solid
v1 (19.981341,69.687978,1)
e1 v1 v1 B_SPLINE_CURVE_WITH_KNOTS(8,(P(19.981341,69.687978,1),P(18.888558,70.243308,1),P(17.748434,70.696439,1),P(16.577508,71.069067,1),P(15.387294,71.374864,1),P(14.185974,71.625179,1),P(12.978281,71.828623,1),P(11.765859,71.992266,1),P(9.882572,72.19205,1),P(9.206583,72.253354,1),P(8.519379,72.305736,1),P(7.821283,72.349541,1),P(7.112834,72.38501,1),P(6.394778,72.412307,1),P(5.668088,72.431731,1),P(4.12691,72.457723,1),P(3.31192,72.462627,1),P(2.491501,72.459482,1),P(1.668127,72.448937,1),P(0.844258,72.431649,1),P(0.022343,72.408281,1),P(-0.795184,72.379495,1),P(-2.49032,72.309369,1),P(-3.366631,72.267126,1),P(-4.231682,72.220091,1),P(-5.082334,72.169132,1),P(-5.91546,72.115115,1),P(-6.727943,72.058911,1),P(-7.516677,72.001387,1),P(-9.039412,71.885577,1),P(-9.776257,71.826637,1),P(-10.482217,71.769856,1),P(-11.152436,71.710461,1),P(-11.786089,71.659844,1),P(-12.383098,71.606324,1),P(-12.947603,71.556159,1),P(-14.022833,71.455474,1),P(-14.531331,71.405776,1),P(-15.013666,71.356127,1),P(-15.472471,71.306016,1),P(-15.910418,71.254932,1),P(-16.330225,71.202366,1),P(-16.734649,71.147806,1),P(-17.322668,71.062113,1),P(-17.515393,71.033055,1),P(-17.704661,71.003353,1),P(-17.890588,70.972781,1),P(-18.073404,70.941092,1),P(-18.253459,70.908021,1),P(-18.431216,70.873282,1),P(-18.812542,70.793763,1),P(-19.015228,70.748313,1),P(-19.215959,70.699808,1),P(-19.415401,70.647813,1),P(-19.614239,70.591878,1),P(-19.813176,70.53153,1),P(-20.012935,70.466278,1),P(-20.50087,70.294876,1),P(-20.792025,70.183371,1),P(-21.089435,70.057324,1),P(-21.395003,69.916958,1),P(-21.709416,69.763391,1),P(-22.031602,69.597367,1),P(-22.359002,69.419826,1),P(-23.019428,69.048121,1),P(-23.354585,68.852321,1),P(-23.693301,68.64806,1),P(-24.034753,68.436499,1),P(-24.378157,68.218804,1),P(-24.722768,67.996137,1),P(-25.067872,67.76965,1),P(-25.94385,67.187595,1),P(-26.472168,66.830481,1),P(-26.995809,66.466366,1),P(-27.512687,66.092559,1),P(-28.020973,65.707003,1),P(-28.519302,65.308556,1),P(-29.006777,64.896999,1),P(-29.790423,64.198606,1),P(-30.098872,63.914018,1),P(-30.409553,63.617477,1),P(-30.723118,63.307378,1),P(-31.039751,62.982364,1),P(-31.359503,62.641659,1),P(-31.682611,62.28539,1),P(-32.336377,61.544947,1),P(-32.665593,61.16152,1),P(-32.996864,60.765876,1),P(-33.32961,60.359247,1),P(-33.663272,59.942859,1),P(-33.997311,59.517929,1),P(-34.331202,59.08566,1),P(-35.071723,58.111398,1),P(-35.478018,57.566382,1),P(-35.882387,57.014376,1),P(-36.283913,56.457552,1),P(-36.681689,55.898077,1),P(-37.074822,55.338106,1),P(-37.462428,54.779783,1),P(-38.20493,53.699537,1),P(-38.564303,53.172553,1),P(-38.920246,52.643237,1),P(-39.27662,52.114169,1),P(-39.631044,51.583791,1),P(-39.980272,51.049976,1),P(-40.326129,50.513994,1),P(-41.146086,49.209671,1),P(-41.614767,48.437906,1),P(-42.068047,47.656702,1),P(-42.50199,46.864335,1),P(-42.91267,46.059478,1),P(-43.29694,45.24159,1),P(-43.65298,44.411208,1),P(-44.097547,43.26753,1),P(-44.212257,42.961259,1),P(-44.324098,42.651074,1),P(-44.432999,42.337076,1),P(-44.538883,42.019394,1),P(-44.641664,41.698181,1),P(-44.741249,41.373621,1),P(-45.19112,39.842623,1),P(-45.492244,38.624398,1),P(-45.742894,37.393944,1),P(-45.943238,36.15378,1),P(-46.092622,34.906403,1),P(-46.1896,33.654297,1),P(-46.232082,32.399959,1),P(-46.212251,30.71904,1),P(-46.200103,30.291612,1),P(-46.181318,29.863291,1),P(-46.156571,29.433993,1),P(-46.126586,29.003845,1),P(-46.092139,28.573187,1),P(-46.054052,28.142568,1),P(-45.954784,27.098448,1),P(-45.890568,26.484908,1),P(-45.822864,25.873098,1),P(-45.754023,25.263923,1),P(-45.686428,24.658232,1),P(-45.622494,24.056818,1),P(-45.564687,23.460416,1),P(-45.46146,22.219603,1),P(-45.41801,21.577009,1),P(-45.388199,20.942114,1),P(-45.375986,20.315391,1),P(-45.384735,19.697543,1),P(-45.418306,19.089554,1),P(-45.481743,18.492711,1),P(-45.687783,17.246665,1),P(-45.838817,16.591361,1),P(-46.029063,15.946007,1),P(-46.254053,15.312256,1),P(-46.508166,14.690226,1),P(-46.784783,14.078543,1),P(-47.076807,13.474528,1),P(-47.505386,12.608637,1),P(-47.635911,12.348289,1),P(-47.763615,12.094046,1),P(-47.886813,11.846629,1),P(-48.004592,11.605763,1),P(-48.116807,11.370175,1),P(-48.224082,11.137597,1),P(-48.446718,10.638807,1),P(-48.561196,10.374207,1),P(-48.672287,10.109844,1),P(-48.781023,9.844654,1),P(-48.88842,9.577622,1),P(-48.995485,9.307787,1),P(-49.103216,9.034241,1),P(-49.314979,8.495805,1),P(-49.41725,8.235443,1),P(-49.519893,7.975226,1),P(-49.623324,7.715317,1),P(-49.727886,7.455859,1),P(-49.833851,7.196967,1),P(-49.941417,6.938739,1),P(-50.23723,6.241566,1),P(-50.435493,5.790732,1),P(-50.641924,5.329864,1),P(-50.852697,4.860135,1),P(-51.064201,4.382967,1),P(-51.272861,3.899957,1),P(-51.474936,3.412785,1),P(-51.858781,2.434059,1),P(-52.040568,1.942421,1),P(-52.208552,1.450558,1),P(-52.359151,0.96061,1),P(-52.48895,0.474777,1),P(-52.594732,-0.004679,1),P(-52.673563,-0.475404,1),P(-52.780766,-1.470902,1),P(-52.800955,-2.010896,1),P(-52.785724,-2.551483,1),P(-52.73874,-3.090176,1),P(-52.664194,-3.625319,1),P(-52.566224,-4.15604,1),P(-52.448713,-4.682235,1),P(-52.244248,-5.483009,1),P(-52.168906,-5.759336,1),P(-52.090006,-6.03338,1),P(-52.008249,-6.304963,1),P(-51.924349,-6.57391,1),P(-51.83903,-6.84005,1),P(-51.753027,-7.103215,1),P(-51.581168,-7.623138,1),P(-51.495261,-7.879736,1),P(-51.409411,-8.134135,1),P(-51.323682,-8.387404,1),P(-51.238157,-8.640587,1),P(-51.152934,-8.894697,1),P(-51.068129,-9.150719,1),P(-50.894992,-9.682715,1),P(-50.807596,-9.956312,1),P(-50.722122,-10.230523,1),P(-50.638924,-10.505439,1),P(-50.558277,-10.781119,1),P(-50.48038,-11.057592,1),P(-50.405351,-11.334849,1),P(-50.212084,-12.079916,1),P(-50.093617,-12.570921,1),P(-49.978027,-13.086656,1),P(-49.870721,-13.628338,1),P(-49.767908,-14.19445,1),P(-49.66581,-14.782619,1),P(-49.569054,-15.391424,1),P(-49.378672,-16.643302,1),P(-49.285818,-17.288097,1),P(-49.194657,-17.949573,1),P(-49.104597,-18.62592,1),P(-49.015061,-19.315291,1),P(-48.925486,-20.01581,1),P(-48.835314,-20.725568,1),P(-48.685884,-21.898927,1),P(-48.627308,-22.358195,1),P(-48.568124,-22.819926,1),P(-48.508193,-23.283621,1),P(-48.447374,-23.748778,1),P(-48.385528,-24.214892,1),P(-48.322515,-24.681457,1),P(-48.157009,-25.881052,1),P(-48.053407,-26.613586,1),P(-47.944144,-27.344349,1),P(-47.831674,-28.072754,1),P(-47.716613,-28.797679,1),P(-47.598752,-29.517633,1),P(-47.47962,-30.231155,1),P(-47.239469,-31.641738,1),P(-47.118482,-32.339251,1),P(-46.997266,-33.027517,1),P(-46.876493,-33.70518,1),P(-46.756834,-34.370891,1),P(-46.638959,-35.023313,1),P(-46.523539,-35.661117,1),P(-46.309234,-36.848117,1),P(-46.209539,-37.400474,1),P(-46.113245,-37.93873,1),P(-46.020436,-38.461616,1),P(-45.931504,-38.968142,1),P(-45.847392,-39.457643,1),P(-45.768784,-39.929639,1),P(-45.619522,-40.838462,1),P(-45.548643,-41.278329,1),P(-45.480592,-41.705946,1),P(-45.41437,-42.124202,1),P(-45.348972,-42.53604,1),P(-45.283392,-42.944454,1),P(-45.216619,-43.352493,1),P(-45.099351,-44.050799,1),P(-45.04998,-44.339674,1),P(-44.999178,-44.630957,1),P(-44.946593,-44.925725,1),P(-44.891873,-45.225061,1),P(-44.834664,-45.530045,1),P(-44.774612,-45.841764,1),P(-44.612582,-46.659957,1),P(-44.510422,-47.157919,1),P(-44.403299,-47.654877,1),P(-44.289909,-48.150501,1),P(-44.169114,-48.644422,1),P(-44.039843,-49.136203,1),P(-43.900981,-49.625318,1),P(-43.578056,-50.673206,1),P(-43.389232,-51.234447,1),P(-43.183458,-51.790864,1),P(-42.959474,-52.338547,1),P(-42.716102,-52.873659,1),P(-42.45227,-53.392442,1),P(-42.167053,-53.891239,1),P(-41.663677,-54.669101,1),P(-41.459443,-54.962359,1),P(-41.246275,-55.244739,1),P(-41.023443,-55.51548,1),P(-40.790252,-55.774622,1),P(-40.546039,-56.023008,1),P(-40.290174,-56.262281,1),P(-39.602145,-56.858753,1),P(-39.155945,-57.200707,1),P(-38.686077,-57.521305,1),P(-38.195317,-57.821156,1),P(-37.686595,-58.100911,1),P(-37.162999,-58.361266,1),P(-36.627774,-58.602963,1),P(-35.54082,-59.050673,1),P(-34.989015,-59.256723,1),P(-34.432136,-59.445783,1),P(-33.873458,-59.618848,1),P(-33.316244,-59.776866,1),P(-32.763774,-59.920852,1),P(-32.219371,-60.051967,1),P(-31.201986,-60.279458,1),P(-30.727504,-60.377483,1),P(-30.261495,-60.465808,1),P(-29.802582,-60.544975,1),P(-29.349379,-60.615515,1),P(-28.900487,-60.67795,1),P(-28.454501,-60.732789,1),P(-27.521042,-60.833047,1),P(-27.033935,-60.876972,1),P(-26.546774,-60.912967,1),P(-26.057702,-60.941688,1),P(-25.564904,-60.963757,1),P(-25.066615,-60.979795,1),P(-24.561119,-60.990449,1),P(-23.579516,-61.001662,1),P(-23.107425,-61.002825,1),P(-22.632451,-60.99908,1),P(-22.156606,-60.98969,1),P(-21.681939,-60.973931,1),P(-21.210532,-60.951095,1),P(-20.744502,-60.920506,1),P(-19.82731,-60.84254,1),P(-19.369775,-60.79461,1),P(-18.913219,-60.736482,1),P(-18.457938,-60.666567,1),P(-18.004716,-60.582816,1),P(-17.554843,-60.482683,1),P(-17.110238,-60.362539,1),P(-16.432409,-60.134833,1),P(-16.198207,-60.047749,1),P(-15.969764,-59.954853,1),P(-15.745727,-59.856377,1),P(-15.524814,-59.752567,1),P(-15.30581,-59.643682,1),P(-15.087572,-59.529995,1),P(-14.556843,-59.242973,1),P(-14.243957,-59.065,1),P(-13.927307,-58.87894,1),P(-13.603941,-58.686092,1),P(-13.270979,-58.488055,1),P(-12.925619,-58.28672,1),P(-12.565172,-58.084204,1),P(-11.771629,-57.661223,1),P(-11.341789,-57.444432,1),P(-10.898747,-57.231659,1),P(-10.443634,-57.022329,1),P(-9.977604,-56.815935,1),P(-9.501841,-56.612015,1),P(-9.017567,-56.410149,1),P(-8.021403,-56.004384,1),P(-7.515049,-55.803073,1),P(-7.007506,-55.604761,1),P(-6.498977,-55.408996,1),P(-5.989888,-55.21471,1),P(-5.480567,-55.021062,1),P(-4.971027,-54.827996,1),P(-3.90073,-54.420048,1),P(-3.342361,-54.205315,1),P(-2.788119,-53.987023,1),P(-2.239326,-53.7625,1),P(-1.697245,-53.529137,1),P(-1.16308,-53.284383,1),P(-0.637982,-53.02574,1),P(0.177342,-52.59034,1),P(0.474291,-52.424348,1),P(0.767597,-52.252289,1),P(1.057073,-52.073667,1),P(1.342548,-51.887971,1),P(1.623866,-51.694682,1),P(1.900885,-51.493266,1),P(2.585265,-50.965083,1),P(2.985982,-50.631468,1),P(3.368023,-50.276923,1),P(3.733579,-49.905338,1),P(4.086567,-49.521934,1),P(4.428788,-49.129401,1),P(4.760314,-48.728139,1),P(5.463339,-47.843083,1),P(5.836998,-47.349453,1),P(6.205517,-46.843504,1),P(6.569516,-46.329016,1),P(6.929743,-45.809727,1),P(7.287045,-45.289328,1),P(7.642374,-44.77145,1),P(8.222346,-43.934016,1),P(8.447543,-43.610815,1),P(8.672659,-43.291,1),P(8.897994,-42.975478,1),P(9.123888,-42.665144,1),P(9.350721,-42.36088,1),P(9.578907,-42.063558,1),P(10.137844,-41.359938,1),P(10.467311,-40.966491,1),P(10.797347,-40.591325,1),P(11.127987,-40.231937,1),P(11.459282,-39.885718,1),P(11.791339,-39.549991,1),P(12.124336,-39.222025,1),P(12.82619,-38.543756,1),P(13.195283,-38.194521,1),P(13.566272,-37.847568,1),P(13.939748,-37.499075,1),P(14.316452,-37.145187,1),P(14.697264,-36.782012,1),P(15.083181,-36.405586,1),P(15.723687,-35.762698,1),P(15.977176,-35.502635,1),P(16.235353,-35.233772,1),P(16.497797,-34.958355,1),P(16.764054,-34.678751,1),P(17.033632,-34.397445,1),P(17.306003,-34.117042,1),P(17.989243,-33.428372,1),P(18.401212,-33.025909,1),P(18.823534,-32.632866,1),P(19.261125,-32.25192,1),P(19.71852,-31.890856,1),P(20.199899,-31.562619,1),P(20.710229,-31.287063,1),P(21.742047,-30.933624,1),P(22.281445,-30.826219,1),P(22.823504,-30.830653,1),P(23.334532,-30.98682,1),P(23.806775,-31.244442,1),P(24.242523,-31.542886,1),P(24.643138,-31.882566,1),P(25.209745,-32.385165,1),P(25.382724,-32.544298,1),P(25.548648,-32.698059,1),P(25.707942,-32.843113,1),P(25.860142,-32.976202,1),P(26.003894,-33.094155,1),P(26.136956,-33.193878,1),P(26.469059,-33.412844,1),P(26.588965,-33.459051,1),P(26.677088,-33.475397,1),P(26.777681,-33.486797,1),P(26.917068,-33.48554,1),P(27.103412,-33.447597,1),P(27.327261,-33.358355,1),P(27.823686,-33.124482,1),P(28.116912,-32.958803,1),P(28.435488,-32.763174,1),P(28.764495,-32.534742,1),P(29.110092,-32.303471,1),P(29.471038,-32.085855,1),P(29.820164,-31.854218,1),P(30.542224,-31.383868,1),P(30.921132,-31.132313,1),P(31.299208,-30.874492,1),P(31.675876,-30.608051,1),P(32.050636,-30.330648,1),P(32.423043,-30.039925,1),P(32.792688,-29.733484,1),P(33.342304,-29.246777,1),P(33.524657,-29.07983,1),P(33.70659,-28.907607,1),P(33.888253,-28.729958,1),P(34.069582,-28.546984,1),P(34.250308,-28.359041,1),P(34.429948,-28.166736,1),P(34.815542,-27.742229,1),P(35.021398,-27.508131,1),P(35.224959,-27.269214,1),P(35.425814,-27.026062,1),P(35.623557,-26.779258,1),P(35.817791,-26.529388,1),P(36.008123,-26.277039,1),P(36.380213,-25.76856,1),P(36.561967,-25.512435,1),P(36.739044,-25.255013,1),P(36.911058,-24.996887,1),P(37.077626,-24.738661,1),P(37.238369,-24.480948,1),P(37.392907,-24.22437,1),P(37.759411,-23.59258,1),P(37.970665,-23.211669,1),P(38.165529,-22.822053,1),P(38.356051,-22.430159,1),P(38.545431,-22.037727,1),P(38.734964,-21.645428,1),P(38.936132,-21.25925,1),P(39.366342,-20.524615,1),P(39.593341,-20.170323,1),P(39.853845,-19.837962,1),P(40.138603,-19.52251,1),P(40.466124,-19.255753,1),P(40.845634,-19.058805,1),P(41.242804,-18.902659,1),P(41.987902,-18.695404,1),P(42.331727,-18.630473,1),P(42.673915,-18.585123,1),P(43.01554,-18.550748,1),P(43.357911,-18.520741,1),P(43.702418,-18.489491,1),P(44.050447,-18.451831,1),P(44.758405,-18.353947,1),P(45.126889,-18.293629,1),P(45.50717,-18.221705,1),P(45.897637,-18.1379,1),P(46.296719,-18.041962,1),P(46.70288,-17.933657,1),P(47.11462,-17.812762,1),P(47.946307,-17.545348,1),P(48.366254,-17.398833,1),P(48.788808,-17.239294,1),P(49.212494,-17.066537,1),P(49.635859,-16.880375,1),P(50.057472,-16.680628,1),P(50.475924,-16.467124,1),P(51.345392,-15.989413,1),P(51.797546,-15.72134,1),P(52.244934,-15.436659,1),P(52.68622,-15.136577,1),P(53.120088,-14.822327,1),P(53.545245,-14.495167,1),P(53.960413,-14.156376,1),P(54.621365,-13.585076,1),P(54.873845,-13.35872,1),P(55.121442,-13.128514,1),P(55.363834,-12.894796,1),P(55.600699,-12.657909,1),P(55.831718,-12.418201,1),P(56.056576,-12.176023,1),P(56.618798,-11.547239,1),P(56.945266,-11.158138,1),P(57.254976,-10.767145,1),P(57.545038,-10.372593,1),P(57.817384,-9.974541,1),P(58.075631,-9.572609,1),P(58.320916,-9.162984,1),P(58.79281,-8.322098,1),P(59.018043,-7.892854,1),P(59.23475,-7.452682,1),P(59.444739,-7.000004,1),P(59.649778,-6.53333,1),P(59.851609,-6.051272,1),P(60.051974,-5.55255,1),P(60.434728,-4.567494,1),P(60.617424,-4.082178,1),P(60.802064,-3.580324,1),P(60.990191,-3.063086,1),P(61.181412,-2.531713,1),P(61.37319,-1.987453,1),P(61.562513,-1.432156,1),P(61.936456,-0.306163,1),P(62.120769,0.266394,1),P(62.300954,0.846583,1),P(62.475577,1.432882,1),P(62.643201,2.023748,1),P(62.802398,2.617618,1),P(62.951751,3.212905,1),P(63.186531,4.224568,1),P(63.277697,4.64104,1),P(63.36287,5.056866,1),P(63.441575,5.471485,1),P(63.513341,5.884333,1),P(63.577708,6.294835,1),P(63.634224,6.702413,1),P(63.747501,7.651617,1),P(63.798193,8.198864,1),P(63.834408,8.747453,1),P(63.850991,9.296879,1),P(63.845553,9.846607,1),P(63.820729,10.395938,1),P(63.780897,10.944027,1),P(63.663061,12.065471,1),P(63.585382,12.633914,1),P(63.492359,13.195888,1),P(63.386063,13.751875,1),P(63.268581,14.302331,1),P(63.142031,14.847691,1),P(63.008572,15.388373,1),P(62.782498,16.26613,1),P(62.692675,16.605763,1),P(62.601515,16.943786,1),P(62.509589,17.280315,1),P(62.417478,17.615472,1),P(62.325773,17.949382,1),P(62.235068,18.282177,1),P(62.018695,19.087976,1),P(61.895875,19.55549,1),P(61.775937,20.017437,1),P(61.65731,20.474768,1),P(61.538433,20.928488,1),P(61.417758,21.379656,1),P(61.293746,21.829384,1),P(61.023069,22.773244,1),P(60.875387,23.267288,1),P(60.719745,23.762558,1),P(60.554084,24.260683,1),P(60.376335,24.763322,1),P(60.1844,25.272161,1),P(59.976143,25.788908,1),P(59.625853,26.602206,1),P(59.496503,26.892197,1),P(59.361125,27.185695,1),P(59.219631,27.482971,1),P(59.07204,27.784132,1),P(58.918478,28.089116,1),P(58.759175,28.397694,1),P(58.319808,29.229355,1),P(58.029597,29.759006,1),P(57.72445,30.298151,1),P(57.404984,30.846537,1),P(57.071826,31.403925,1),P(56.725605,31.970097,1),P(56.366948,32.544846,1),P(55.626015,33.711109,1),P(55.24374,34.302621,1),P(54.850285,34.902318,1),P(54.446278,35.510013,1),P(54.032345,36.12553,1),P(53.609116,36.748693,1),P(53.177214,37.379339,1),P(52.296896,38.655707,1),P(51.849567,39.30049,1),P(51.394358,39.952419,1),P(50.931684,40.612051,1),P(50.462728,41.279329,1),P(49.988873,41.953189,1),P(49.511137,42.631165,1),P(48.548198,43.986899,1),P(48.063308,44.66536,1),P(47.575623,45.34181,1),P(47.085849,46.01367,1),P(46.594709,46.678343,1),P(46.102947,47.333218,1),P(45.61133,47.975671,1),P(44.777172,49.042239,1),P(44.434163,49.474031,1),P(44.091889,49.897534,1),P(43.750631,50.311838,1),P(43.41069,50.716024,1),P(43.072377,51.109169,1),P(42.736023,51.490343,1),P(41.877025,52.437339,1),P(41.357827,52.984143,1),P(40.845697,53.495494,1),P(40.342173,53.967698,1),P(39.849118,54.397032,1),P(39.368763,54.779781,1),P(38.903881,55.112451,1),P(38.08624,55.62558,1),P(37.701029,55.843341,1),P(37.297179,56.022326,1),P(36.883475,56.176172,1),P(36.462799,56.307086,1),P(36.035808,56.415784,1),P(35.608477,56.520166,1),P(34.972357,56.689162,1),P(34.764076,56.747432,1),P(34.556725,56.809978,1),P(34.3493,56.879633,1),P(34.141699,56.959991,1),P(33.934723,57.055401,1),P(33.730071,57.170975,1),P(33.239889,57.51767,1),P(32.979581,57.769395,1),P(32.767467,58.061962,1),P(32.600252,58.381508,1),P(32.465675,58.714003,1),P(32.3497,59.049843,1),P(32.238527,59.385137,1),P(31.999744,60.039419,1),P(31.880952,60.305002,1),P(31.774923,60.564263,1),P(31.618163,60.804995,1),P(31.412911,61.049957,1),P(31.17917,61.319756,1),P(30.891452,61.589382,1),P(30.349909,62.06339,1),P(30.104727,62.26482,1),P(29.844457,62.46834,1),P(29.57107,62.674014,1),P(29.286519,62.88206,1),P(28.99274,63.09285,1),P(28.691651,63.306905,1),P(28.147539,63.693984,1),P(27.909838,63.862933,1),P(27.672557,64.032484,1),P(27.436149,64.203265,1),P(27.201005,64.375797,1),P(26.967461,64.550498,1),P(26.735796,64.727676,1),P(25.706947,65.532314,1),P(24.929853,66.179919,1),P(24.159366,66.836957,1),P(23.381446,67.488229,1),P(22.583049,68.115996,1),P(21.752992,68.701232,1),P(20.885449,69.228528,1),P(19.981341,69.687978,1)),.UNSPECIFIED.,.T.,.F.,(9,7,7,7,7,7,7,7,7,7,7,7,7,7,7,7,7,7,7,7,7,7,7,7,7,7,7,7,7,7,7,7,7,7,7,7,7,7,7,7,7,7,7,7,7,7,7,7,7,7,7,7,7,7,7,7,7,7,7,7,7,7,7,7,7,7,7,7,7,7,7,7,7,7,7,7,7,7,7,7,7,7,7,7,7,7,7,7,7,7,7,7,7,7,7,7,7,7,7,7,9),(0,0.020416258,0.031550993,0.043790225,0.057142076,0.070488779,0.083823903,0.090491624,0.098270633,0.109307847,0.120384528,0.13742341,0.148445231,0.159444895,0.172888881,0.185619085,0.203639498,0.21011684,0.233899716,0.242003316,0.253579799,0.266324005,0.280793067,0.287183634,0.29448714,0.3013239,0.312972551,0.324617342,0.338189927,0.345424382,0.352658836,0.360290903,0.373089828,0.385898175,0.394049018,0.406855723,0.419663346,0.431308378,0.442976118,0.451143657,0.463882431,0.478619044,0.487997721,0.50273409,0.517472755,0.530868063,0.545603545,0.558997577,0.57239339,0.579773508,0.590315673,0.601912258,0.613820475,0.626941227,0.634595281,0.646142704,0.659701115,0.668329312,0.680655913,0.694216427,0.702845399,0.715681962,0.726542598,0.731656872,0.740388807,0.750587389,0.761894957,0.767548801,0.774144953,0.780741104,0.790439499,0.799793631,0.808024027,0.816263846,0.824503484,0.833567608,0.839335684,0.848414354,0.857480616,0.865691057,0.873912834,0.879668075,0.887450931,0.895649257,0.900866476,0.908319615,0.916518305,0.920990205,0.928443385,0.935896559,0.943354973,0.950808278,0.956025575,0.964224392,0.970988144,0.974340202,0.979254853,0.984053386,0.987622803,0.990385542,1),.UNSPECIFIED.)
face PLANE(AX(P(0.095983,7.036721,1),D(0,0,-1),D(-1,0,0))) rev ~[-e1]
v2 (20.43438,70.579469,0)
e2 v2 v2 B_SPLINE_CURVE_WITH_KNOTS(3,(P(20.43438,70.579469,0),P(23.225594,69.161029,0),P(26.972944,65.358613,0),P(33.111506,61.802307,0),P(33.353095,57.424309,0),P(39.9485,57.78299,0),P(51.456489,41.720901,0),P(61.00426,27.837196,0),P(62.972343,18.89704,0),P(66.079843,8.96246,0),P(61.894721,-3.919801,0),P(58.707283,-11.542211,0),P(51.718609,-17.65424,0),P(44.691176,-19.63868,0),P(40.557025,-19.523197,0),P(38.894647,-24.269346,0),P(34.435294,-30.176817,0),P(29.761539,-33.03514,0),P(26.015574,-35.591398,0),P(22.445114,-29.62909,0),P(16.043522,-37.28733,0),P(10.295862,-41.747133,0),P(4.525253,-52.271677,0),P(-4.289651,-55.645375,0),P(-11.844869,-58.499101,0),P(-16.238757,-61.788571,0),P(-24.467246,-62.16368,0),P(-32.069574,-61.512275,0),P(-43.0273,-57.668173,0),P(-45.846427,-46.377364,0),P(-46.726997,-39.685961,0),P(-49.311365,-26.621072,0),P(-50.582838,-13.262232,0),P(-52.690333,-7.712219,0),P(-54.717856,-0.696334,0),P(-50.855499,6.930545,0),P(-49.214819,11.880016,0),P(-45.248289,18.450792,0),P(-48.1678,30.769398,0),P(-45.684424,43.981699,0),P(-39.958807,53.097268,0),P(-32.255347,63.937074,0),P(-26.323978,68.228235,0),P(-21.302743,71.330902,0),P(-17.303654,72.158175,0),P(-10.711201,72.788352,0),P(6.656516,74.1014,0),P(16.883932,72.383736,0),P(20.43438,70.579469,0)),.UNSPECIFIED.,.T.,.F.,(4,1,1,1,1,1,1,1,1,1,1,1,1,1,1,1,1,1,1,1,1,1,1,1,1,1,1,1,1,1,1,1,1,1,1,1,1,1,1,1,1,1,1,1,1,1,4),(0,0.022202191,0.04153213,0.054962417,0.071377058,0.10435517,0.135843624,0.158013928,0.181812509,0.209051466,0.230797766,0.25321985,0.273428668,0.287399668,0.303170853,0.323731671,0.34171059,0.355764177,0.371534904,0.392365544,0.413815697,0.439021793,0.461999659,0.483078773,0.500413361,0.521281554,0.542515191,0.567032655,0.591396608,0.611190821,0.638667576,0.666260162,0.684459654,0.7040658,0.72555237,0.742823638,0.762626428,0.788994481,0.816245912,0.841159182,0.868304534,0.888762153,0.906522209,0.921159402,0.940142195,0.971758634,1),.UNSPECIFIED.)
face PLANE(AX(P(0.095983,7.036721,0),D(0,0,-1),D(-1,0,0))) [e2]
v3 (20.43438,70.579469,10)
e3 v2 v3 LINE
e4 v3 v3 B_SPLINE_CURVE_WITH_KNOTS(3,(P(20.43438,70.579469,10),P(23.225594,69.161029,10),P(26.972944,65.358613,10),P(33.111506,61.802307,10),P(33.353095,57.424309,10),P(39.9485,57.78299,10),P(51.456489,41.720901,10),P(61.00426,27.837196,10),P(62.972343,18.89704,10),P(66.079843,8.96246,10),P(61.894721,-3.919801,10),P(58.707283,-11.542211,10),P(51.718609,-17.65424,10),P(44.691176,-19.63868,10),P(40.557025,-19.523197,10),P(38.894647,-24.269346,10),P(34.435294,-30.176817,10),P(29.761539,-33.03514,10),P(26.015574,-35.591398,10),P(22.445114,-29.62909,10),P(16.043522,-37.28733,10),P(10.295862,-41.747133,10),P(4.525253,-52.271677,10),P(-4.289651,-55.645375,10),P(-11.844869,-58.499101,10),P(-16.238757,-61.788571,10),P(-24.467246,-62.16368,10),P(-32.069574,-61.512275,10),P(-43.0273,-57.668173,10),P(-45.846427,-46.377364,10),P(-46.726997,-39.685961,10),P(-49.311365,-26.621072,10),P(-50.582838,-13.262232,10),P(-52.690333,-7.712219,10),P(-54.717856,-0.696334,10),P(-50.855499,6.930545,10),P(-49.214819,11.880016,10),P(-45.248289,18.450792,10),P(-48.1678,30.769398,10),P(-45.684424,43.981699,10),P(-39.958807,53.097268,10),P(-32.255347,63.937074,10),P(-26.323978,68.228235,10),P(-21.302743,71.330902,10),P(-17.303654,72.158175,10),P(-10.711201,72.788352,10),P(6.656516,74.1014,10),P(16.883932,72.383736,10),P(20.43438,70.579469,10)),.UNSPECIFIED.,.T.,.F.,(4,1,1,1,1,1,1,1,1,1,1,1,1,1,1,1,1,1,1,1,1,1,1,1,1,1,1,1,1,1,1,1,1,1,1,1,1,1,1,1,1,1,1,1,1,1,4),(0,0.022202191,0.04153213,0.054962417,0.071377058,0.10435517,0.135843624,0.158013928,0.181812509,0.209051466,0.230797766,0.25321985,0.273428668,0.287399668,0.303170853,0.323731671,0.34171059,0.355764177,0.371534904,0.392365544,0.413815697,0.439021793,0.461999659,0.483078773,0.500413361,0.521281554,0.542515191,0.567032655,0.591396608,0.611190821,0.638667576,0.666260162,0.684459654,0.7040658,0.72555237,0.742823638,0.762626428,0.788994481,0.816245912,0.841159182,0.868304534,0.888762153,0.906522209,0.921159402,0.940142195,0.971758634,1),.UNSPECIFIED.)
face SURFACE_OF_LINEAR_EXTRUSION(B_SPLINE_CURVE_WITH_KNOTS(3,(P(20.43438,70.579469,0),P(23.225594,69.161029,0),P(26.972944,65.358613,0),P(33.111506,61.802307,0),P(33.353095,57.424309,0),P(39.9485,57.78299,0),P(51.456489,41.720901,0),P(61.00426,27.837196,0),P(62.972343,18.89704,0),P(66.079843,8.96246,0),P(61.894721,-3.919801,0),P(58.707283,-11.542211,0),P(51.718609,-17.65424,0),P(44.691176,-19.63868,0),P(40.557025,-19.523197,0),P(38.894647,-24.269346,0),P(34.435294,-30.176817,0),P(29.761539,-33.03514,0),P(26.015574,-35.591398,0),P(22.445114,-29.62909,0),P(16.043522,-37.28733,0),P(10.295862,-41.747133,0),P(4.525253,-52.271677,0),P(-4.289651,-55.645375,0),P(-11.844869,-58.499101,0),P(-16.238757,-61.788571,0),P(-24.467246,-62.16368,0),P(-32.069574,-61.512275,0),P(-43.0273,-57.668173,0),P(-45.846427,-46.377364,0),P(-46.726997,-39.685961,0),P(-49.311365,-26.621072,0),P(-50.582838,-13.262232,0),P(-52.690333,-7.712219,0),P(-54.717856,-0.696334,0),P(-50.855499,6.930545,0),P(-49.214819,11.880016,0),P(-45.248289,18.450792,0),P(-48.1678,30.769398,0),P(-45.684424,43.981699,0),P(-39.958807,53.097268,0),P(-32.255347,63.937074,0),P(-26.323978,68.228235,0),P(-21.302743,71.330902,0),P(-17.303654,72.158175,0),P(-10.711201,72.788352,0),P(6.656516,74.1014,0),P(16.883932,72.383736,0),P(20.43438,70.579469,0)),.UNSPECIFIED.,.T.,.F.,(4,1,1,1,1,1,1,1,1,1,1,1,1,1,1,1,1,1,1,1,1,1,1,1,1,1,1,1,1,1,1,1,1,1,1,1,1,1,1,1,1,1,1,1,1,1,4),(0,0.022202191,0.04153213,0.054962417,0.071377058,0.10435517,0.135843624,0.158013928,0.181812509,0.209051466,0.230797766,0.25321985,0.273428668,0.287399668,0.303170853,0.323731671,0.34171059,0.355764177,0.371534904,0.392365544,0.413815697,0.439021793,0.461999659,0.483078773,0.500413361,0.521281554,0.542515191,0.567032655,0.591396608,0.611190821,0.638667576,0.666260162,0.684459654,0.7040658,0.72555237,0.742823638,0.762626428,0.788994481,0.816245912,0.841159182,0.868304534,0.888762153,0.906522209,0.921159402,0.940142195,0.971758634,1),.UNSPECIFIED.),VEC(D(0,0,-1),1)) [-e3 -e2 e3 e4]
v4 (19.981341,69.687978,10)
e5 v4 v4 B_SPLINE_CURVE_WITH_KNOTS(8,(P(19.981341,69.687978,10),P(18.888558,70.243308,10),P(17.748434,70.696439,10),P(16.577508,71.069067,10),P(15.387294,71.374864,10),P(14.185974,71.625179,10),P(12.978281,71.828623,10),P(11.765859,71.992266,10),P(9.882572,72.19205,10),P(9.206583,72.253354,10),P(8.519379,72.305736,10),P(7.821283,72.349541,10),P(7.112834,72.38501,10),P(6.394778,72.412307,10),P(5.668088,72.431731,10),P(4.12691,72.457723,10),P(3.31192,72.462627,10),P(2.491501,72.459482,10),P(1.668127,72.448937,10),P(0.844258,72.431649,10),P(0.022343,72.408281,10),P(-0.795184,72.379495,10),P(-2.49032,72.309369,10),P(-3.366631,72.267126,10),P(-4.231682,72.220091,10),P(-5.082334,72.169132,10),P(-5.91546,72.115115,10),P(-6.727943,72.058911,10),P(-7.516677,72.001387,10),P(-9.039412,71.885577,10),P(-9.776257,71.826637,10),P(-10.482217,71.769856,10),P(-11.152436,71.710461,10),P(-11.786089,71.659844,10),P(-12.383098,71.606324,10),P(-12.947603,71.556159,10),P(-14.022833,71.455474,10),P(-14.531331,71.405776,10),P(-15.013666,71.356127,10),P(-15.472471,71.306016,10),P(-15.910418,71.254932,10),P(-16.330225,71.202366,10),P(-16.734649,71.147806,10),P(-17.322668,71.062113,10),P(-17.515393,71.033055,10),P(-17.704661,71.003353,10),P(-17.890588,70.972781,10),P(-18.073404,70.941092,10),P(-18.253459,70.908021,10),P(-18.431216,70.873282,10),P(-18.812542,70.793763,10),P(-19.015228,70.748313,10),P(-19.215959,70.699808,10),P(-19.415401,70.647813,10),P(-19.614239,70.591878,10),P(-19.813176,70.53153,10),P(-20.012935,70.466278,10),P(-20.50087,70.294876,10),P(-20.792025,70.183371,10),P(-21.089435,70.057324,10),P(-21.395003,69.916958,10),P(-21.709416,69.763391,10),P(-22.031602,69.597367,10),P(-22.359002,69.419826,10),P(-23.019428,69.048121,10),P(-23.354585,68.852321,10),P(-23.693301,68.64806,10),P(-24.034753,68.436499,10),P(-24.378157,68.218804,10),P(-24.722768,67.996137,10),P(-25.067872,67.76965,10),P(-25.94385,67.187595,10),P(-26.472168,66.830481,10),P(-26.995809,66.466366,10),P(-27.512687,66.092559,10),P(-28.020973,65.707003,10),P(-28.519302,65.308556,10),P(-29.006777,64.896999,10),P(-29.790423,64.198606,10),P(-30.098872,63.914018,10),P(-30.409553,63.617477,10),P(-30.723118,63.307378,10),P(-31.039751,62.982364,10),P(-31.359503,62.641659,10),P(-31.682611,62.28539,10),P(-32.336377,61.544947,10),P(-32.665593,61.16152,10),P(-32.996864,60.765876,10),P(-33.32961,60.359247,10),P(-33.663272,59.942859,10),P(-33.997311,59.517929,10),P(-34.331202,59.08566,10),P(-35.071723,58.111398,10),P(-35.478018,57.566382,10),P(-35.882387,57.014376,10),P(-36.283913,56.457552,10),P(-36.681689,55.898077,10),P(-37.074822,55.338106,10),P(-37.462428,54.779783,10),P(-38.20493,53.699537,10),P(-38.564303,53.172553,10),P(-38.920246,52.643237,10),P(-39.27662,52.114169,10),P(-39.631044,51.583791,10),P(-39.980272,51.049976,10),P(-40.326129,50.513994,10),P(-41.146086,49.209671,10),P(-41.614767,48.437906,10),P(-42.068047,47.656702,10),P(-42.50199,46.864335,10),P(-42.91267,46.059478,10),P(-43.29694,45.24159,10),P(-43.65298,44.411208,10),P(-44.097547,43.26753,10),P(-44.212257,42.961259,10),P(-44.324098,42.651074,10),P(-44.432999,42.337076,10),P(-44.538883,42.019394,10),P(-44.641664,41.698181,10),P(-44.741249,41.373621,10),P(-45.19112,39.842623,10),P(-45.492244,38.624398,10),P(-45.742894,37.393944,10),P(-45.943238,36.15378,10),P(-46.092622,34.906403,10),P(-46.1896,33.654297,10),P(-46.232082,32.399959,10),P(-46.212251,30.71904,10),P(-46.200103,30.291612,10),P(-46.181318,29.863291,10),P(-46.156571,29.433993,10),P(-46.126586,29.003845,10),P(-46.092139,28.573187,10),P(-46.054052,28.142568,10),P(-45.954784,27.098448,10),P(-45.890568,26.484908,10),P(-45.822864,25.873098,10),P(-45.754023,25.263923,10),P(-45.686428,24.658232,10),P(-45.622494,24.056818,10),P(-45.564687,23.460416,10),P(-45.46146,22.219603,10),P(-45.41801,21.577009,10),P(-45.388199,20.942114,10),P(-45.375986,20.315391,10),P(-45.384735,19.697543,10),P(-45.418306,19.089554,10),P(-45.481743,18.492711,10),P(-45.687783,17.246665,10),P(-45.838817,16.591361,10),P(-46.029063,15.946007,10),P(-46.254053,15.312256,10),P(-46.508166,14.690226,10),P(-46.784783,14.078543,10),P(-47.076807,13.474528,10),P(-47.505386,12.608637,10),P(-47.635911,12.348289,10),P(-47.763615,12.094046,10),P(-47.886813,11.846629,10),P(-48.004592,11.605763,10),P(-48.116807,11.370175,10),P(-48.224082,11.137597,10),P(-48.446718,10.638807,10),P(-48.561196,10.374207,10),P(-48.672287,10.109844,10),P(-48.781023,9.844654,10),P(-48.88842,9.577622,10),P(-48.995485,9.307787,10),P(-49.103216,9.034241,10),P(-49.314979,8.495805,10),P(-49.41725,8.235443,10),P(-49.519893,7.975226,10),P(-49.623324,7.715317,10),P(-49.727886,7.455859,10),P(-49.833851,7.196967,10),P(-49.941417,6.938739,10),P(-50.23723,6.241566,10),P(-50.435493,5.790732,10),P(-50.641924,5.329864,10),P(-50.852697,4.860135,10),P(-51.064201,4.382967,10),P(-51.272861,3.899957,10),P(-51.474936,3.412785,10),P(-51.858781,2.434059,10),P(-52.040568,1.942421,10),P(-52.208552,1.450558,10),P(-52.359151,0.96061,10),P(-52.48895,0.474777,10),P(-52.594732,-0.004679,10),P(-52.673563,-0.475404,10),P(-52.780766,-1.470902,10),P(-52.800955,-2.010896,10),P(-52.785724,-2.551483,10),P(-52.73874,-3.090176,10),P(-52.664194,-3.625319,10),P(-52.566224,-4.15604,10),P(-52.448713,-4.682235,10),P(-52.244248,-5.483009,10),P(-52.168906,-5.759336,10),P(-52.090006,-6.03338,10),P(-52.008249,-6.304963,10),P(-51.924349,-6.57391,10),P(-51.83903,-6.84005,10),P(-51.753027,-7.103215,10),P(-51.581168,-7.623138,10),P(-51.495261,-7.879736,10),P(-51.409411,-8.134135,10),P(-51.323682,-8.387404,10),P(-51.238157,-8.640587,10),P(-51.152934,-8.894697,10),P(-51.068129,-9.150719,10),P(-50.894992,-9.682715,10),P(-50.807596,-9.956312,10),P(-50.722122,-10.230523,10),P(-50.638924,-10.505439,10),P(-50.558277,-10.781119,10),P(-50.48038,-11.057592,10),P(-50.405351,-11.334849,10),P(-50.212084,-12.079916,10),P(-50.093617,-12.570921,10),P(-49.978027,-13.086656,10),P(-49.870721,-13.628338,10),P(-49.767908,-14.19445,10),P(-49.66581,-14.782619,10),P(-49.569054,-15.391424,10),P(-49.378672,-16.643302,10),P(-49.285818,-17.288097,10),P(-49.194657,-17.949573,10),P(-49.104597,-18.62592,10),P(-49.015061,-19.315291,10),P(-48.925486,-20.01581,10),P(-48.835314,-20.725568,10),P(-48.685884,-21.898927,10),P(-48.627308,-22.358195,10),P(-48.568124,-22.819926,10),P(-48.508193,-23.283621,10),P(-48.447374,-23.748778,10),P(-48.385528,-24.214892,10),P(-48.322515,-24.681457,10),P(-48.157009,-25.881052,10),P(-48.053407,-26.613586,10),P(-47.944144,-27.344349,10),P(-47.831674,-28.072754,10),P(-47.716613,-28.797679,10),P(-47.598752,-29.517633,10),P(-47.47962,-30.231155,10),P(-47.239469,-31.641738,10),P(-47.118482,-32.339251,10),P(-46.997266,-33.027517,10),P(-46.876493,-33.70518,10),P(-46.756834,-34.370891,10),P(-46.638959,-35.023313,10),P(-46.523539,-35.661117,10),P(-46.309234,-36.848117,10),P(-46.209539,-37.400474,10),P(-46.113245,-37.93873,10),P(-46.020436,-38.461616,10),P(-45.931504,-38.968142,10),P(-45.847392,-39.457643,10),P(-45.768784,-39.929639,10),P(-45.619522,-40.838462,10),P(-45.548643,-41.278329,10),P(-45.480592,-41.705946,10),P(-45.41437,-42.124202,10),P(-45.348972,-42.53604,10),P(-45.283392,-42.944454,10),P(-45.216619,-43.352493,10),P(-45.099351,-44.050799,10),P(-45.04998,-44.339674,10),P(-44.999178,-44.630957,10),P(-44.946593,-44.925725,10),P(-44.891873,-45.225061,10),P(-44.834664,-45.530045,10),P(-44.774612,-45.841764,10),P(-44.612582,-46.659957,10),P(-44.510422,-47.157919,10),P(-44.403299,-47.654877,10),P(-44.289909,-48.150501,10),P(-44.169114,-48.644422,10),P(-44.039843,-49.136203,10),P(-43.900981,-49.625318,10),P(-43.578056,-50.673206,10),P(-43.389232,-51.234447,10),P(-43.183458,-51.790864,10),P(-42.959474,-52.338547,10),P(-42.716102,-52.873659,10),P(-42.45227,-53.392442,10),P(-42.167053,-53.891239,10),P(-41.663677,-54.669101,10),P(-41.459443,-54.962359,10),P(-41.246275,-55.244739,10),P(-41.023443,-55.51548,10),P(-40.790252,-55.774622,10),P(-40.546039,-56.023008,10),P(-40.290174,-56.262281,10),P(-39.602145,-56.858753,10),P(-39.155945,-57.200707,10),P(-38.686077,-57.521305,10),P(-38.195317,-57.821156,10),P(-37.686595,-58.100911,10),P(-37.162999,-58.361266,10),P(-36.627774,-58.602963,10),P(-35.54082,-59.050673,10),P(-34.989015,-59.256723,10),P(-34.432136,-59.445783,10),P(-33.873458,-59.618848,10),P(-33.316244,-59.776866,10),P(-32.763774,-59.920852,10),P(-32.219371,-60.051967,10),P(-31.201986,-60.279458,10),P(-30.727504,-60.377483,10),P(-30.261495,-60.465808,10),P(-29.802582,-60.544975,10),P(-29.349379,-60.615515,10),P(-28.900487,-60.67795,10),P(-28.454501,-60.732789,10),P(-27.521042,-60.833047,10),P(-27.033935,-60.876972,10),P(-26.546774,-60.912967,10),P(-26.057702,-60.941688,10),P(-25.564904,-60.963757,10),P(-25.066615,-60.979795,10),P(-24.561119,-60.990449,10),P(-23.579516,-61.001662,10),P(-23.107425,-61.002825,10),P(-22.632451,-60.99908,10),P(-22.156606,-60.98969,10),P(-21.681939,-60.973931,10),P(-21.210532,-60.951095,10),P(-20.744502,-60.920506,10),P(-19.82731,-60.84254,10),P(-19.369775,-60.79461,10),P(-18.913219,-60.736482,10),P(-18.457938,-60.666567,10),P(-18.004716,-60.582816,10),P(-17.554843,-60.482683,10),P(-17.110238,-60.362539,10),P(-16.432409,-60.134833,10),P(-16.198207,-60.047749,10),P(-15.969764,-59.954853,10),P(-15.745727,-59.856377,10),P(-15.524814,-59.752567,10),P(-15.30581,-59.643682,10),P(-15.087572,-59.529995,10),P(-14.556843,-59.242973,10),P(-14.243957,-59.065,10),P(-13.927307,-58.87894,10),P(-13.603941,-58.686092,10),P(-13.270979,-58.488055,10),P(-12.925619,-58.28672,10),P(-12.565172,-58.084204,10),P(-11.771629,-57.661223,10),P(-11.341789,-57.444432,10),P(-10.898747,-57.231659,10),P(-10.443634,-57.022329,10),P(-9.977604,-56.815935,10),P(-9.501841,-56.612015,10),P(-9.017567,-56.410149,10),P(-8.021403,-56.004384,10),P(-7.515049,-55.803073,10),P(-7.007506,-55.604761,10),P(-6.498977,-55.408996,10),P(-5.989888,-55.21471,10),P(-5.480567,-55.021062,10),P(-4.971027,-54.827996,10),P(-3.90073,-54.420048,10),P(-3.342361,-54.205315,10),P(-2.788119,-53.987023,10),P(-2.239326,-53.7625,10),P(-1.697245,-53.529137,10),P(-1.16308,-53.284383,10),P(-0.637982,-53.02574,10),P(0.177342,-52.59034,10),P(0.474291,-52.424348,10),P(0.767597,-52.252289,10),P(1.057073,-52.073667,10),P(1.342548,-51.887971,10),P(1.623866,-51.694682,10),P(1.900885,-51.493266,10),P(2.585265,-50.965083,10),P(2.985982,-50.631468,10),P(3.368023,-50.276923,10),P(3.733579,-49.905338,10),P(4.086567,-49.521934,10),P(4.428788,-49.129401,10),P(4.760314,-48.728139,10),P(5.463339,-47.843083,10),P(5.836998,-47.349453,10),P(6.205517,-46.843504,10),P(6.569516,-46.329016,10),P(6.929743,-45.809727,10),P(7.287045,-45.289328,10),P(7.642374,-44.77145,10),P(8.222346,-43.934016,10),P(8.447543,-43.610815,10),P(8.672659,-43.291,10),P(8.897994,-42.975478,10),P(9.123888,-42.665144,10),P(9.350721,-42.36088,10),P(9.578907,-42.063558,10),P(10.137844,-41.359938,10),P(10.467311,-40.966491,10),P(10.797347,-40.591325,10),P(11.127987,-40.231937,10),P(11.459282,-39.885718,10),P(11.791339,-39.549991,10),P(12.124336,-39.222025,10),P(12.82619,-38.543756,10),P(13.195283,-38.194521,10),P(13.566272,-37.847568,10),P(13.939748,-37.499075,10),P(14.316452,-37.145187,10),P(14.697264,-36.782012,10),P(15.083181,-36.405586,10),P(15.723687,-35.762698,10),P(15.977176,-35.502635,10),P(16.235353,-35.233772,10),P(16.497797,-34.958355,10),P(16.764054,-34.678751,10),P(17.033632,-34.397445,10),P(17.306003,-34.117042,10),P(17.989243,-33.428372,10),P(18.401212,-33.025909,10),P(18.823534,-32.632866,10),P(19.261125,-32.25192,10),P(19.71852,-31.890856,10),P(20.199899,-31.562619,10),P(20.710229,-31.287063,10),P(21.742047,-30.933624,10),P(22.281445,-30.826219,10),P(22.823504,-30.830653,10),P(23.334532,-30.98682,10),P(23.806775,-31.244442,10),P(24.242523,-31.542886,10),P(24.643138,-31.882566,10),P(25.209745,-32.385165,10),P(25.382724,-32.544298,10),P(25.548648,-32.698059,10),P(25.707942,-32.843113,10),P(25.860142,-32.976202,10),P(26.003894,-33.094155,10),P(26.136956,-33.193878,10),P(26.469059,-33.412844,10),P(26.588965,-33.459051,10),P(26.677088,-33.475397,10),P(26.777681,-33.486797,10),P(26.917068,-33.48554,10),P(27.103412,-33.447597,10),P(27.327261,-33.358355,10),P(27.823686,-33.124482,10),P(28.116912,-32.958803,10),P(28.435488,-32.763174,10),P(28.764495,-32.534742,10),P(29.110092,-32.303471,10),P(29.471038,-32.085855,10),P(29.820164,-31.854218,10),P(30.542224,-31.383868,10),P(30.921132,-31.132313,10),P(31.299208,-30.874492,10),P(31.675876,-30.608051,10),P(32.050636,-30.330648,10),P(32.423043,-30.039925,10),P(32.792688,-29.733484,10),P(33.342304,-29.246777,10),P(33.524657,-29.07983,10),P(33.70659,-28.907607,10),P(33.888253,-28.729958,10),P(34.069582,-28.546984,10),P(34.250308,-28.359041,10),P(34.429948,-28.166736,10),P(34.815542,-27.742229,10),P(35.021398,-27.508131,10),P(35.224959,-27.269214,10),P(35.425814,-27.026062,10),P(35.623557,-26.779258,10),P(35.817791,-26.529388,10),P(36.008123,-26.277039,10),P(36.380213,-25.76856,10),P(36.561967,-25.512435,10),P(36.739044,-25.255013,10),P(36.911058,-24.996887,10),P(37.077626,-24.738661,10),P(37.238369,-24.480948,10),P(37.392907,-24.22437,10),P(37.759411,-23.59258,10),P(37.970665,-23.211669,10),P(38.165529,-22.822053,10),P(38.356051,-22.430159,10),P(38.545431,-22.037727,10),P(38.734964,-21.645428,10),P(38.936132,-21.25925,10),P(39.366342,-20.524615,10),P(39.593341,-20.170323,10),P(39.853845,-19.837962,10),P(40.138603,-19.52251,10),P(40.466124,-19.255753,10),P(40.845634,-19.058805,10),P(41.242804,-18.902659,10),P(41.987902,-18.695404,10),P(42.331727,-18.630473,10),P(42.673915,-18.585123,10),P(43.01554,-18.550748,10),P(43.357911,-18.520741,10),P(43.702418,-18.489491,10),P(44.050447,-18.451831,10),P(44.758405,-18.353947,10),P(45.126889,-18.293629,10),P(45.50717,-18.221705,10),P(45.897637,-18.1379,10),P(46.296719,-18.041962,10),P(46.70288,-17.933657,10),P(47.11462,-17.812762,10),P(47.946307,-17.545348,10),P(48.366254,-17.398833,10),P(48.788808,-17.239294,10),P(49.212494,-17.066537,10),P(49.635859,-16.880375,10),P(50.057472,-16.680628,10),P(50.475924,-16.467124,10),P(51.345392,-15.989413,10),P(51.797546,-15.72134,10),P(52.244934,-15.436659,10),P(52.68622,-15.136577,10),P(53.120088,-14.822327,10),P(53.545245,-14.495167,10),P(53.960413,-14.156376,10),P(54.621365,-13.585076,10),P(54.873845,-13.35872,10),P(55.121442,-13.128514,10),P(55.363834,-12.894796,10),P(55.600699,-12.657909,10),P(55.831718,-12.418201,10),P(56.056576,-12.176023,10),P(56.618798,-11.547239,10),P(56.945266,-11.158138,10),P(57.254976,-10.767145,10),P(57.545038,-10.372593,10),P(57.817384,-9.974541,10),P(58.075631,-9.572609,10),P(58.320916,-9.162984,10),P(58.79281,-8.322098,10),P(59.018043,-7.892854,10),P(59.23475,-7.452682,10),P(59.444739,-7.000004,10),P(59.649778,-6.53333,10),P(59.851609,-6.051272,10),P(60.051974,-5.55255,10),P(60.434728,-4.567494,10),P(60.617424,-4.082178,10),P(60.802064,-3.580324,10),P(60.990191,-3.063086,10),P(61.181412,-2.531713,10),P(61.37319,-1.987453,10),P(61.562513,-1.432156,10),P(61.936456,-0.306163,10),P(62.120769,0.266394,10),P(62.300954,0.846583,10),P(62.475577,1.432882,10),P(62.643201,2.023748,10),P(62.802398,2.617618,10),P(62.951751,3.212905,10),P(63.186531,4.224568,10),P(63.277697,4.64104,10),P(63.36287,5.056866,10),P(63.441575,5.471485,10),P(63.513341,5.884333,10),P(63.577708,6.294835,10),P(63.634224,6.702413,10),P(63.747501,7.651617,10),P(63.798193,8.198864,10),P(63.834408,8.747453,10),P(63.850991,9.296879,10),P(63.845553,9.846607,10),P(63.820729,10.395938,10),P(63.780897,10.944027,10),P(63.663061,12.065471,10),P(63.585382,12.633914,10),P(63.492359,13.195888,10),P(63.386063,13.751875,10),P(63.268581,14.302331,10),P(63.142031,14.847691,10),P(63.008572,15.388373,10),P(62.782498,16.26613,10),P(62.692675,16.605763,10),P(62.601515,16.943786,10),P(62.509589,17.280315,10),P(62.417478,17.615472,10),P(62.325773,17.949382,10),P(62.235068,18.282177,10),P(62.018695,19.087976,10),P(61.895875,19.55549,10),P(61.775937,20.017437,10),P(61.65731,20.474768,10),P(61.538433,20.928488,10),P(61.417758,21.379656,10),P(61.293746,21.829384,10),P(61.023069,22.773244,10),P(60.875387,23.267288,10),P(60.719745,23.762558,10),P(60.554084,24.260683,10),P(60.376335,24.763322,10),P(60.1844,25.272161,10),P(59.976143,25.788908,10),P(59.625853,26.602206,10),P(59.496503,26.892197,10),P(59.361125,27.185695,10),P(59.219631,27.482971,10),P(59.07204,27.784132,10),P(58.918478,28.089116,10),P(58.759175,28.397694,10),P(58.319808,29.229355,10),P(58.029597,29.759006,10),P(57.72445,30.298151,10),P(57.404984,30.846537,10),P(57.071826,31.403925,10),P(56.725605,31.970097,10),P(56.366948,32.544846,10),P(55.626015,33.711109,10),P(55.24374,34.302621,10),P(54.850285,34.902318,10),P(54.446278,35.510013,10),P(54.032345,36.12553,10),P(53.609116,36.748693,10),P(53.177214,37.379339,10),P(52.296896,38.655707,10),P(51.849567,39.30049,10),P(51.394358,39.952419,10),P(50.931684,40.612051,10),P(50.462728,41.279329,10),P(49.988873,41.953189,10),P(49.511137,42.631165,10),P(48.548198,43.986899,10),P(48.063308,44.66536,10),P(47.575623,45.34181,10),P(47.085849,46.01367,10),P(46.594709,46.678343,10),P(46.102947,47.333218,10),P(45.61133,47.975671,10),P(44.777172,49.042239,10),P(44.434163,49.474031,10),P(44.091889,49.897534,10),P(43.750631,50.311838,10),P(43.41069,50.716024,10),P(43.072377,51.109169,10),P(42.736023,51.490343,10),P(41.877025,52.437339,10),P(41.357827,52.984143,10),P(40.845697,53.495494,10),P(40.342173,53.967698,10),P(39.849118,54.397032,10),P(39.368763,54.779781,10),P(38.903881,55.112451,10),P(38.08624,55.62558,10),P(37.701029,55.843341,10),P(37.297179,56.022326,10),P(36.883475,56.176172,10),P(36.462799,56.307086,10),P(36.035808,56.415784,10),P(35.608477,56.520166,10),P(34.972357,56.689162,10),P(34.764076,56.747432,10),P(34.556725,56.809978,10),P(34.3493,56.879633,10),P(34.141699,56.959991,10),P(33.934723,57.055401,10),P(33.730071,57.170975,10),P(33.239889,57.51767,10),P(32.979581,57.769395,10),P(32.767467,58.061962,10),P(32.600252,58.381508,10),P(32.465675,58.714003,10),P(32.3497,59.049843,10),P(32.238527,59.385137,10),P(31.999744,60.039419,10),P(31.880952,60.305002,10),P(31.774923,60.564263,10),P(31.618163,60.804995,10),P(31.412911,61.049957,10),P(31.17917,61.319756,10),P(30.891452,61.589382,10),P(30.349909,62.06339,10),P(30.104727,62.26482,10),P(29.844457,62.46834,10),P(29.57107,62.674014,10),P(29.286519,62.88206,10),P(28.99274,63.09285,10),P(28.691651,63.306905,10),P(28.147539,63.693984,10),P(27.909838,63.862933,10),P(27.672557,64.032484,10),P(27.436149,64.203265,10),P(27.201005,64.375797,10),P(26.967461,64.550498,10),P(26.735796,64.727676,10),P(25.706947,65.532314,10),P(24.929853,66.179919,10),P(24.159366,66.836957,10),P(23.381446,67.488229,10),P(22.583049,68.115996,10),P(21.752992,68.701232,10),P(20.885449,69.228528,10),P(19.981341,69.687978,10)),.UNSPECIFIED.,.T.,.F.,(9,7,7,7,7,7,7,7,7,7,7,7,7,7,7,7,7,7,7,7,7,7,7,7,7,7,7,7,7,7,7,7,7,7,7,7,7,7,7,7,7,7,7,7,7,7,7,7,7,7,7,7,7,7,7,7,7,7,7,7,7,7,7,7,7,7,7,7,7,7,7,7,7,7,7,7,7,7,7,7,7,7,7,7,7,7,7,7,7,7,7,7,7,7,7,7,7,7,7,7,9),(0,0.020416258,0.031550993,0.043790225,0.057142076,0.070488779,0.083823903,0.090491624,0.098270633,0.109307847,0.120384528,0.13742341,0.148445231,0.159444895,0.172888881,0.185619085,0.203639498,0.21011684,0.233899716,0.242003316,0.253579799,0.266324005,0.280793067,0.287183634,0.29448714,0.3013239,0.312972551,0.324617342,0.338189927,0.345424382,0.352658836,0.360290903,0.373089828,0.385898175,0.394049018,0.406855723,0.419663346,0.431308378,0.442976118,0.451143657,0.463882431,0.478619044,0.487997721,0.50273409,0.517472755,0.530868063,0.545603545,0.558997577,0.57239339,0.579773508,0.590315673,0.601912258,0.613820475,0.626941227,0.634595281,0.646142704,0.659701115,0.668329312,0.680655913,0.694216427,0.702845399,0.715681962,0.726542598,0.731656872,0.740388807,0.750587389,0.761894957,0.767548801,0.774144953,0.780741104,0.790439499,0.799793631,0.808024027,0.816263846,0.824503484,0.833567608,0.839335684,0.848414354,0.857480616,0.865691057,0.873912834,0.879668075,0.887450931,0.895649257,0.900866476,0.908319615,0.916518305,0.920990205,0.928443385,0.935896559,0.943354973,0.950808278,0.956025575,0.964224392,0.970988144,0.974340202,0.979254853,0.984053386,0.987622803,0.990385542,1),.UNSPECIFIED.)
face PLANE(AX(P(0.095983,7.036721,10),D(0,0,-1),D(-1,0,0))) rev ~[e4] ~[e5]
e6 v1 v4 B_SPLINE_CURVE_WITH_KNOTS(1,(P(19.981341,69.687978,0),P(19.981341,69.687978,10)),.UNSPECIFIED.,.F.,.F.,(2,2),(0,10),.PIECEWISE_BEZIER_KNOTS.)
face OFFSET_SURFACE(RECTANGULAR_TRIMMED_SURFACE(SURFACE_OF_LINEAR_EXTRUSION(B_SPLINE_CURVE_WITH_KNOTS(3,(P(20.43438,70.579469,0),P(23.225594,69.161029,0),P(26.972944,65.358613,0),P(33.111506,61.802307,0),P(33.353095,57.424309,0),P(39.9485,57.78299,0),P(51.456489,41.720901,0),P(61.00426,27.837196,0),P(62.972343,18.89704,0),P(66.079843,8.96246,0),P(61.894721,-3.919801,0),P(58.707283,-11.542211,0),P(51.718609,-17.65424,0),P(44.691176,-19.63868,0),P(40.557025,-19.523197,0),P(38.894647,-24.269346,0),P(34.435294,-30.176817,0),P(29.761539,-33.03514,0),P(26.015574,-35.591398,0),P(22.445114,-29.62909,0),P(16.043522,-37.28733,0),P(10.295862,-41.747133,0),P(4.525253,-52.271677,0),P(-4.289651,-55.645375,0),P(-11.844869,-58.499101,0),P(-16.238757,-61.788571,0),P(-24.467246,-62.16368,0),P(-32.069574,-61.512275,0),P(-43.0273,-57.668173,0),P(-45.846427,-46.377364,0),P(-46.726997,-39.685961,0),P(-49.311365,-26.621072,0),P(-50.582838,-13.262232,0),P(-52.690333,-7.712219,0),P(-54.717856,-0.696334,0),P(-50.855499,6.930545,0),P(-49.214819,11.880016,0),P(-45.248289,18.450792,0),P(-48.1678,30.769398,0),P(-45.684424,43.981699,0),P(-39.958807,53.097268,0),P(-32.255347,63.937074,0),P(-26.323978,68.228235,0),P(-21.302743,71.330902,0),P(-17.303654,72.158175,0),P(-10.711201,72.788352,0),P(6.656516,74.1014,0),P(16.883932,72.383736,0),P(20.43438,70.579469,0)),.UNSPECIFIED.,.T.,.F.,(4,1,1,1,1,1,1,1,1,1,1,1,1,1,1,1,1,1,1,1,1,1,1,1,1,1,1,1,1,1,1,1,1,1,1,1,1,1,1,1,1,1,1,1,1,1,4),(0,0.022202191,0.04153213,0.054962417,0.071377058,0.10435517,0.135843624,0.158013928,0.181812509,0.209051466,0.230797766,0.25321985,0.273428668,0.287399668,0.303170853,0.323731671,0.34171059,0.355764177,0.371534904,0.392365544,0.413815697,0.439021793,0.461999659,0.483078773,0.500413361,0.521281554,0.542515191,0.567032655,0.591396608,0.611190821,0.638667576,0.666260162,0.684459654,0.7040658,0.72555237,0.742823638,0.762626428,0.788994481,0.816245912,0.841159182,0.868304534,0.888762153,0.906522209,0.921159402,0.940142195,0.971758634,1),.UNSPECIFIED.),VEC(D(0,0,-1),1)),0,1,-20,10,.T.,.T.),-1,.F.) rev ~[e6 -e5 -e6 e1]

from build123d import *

# Parameters (mm, degrees)
F1_DEPTH = 10
F2_T     = -1


# Not quite as in the source:
# - the program builds the solid bodies; features that only make, move or delete a surface that nothing else refers to are left out


with BuildPart() as f1:
    # F0 (on Top) → F1 (new body)
    with BuildSketch(Plane.XY):
        with BuildLine():
            add(Edge.make_bspline(
                [(20.4343795776, 70.5794692039), (23.2255943634, 69.1610291324), (26.9729444714, 65.3586125558), (33.1115059027, 61.802307457), (33.353094905, 57.4243094852), (39.9485003526, 57.7829896142), (51.4564892401, 41.7209013553), (61.0042596604, 27.8371959959), (62.972342712, 18.8970400026), (66.0798432736, 8.9624596366), (61.8947210752, -3.9198011884), (58.7072826853, -11.5422109809), (51.7186085898, -17.6542399624), (44.6911757702, -19.6386799567), (40.557024863, -19.5231969213), (38.8946474266, -24.2693457111), (34.4352944942, -30.1768172802), (29.7615390973, -33.0351402567), (26.0155740701, -35.5913978153), (22.4451140773, -29.629090093), (16.0435216523, -37.287329721), (10.2958622914, -41.7471331624), (4.5252530384, -52.2716774174), (-4.2896512629, -55.6453750465), (-11.8448693641, -58.4991011379), (-16.2387565358, -61.7885708164), (-24.4672460338, -62.1636795067), (-32.0695741109, -61.5122745673), (-43.0272999465, -57.6681731042), (-45.8464268685, -46.377364224), (-46.7269967399, -39.6859611297), (-49.3113650115, -26.6210722433), (-50.5828375785, -13.2622323405), (-52.6903325787, -7.7122186299), (-54.717856371, -0.6963341265), (-50.8554992614, 6.9305449984), (-49.2148192971, 11.8800162074), (-45.248289308, 18.4507915844), (-48.1677997071, 30.7693982937), (-45.684423627, 43.9816988921), (-39.9588068391, 53.0972684254), (-32.255347465, 63.9370744348), (-26.323977847, 68.2282349033), (-21.3027434152, 71.3309022182), (-17.303654426, 72.1581748903), (-10.7112013183, 72.7883515104), (6.6565155143, 74.101399879), (16.8839318932, 72.3837363974), (20.4343795776, 70.5794692039)],
                knots=[0, 0, 0, 0, 0.0222021914, 0.0415321296, 0.0549624171, 0.0713770584, 0.10435517, 0.1358436241, 0.1580139281, 0.1818125087, 0.209051466, 0.2307977655, 0.2532198496, 0.273428668, 0.2873996682, 0.3031708528, 0.323731671, 0.3417105901, 0.3557641774, 0.3715349039, 0.3923655442, 0.4138156968, 0.4390217932, 0.4619996591, 0.4830787734, 0.500413361, 0.5212815544, 0.5425151912, 0.5670326547, 0.5913966084, 0.6111908214, 0.6386675756, 0.6662601616, 0.6844596541, 0.7040658002, 0.7255523705, 0.7428236383, 0.7626264276, 0.7889944813, 0.816245912, 0.8411591823, 0.8683045338, 0.8887621527, 0.9065222088, 0.9211594016, 0.9401421947, 0.9717586338, 1, 1, 1, 1], degree=3))
        make_face()
    extrude(amount=F1_DEPTH)

    # F2
    f2_openings = [f1.faces().sort_by_distance(p)[0] for p in [
        (0.157908, 9.12676, 10),
    ]]
    offset(amount=F2_T, openings=f2_openings)


solid = f1.part
